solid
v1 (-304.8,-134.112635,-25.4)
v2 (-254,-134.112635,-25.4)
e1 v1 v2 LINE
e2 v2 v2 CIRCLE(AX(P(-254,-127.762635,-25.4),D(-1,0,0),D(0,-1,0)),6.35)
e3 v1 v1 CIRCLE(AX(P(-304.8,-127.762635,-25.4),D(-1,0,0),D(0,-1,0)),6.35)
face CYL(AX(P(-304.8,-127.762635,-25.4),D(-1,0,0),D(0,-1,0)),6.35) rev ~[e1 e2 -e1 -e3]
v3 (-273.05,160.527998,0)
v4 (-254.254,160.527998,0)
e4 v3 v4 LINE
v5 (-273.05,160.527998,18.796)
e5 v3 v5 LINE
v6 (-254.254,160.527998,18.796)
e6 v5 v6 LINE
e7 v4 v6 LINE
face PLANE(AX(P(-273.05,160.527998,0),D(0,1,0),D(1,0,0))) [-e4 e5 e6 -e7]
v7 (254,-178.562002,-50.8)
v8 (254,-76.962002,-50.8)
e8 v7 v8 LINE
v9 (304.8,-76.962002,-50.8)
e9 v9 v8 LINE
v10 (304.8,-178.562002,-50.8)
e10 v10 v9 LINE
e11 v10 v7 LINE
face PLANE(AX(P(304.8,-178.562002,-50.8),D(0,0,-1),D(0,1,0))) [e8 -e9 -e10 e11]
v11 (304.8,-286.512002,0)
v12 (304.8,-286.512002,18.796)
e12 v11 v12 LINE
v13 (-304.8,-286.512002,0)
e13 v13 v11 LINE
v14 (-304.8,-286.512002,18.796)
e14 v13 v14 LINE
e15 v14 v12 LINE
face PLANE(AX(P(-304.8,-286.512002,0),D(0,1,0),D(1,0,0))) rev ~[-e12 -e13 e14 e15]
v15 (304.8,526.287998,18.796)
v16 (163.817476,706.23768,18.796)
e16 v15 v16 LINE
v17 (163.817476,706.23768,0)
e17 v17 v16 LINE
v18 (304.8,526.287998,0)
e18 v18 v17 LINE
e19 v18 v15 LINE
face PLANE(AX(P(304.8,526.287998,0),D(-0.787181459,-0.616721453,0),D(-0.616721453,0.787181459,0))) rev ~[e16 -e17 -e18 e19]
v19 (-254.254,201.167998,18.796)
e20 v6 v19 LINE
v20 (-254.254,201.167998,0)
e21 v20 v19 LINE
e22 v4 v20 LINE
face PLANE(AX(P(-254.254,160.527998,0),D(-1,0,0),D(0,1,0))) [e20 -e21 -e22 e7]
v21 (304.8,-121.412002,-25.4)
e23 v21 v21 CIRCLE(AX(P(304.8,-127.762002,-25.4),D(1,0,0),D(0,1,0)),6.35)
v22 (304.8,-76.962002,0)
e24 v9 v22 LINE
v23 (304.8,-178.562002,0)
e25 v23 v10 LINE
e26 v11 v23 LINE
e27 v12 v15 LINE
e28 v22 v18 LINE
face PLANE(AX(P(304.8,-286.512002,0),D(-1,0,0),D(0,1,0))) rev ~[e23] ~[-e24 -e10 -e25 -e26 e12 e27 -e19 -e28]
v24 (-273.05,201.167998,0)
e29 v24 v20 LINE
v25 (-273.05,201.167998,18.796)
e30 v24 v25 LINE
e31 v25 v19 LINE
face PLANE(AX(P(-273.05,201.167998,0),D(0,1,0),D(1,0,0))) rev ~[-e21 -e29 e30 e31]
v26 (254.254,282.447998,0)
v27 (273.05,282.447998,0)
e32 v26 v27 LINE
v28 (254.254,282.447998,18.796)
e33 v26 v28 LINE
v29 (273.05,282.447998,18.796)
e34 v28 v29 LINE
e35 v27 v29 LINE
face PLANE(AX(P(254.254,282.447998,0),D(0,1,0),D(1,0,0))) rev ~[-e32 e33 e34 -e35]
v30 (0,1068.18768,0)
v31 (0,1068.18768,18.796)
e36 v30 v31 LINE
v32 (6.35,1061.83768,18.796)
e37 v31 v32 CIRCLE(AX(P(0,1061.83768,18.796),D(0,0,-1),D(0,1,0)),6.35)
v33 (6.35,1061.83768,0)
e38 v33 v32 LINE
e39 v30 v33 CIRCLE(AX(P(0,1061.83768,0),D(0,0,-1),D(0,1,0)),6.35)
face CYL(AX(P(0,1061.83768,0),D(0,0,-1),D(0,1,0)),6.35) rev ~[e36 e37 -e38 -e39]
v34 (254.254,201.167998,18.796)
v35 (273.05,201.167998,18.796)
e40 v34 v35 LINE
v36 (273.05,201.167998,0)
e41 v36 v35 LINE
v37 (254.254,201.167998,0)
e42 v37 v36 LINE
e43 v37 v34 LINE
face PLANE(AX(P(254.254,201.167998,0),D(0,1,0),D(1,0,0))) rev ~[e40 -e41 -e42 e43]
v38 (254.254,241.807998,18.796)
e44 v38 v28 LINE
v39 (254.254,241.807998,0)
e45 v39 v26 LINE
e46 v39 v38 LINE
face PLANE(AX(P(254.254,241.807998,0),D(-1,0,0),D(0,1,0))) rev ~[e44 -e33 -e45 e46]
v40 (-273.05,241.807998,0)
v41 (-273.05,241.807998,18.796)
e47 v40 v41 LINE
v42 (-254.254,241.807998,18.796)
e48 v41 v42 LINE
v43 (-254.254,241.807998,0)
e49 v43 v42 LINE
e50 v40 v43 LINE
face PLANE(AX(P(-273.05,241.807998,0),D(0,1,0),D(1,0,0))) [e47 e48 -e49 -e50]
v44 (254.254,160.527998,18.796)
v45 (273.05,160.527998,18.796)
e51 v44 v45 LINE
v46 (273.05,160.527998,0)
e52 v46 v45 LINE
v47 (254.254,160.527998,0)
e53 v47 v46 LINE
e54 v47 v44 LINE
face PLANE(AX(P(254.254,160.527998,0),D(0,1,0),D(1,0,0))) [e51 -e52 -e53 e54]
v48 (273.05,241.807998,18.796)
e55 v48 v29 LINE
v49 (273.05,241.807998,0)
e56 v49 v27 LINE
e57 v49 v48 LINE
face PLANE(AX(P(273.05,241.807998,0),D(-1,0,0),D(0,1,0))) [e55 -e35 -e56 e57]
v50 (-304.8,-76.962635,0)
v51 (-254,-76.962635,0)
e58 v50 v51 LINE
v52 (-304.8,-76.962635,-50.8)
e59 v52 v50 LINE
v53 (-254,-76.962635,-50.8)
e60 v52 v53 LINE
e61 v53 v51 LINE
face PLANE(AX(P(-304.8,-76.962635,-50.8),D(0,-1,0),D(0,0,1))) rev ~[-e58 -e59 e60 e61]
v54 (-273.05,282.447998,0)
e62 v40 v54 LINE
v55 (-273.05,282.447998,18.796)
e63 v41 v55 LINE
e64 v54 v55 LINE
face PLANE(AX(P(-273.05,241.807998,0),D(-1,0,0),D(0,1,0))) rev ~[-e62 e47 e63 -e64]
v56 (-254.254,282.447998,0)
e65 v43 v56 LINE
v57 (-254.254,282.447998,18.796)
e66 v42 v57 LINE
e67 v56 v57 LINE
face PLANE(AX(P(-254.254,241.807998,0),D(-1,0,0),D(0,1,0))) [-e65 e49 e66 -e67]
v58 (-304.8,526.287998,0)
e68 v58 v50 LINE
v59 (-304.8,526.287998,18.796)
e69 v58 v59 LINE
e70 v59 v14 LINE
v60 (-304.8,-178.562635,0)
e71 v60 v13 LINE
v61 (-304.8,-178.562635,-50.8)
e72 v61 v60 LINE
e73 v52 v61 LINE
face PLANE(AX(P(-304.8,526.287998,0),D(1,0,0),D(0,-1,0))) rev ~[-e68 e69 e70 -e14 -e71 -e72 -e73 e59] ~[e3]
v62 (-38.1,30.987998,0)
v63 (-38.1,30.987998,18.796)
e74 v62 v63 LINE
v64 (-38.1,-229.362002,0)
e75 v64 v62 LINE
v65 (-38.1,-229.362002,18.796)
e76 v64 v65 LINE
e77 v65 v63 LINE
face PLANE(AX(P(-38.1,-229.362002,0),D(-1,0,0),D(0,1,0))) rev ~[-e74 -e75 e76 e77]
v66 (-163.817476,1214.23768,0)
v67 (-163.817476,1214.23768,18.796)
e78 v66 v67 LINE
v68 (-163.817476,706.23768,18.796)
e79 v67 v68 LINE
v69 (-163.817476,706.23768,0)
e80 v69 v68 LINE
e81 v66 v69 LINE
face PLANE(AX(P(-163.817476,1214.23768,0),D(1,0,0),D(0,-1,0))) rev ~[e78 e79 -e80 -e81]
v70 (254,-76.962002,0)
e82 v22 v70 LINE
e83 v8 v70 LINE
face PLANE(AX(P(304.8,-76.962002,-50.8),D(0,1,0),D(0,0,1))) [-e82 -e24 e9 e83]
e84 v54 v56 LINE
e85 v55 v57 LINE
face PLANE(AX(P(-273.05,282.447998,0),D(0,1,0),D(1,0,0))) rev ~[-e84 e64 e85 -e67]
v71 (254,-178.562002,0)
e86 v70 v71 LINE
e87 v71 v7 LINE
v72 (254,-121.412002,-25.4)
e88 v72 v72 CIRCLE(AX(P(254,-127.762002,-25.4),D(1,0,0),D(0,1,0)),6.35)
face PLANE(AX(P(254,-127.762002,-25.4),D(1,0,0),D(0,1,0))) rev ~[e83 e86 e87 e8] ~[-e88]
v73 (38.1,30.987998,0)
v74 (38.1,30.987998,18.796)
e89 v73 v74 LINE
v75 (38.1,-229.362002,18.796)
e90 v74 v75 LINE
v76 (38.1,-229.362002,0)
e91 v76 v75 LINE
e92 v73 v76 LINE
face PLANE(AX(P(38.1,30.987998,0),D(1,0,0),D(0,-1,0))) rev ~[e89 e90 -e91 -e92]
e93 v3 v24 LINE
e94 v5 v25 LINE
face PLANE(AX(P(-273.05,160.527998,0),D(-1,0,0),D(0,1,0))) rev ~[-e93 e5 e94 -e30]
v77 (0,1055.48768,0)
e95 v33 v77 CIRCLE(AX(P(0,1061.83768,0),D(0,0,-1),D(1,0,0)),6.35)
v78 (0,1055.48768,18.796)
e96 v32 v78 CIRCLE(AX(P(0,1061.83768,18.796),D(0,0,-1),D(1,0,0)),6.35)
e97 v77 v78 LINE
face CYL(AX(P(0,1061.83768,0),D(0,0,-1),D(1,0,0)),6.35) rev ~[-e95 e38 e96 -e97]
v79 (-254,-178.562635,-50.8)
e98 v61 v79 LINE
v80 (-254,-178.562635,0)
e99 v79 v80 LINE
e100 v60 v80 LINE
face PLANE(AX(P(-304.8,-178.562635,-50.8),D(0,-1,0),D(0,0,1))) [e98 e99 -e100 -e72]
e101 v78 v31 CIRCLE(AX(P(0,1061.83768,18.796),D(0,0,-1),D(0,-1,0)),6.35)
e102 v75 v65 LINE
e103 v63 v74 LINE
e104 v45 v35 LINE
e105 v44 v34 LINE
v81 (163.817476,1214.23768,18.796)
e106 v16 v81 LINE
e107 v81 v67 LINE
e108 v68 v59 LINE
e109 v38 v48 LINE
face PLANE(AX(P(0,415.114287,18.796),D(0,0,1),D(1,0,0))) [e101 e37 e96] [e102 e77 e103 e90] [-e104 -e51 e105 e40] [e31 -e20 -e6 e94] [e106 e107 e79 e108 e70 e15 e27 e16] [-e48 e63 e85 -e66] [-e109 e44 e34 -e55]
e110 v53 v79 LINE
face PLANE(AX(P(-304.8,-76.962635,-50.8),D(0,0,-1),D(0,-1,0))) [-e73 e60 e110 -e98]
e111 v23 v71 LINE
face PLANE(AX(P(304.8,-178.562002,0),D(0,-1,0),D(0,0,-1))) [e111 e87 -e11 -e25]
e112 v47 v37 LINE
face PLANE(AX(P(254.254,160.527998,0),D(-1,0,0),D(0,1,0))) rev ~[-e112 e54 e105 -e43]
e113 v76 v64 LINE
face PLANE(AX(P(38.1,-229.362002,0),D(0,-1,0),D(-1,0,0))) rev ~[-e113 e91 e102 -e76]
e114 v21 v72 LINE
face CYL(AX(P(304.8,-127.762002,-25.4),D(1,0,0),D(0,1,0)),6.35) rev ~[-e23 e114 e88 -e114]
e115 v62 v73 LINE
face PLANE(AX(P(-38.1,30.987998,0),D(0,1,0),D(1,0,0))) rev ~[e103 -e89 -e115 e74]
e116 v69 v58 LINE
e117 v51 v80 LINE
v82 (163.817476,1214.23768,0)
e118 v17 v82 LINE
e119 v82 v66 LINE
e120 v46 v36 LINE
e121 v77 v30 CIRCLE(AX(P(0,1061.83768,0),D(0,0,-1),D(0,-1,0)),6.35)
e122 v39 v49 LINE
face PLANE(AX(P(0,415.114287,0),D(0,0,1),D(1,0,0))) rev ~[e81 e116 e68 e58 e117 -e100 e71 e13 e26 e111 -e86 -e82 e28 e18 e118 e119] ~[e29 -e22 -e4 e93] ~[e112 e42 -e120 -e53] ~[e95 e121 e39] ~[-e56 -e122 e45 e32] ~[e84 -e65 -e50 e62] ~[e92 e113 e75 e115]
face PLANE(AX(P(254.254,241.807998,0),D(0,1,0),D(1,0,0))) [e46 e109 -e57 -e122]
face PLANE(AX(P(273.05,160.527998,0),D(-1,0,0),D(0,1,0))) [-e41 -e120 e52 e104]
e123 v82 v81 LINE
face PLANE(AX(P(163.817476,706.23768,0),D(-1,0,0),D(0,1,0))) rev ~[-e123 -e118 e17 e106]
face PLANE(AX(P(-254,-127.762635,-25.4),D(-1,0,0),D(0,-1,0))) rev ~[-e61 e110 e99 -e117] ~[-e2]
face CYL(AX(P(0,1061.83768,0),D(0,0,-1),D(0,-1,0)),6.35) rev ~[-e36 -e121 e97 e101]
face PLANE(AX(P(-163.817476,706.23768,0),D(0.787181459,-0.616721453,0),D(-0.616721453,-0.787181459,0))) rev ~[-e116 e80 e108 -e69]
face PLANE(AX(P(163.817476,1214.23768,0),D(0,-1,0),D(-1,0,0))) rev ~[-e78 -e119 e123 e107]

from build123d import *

# Parameters (mm, degrees)
F0_W     = 18.796
F0_H     = 40.64
F1_DEPTH = 18.796
F2_R     = 6.35
F3_DEPTH = 50.8
F4_W     = 101.6
F4_H     = 50.8
F4_R     = 6.35
F5_DEPTH = 50.8


# Not quite as in the source:
# - a feature names something its author has since deleted; it is built from what else it names


with BuildPart() as f1:
    # F0 (on Top) → F1 (new body)
    with BuildSketch(Plane.XY):
        Polygon((-163.8174757903, 706.2376797943), (-304.8, 526.2879983068), (-304.8, 30.9879983068), (-304.8, -286.5120016932), (304.8, -286.5120016932), (304.8, 30.9879983068), (304.8, 526.2879983068), (163.8174757903, 706.2376797943), (163.8174757903, 1214.2376797943), (-163.8174757903, 1214.2376797943), align=None)
        with Locations((-263.652, 180.8479983068)):
            Rectangle(F0_W, F0_H, mode=Mode.SUBTRACT)
        with Locations((-263.652, 262.1279983068)):
            Rectangle(F0_W, F0_H, mode=Mode.SUBTRACT)
        Polygon((38.1, 30.9879983068), (38.1, -229.3620016932), (-38.1, -229.3620016932), (-38.1, 30.9879983068), (0, 30.9879983068), align=None, mode=Mode.SUBTRACT)
        with Locations((263.652, 180.8479983068)):
            Rectangle(F0_W, F0_H, mode=Mode.SUBTRACT)
        with Locations((263.652, 262.1279983068)):
            Rectangle(F0_W, F0_H, mode=Mode.SUBTRACT)
        with BuildLine():
            ThreePointArc((0, 1055.4876797943), (-6.35, 1061.8376797943), (0, 1068.1876797943))
            ThreePointArc((0, 1068.1876797943), (4.4901280605, 1066.3278078548), (6.35, 1061.8376797943))
            ThreePointArc((6.35, 1061.8376797943), (4.4901280605, 1057.3475517337), (0, 1055.4876797943))
        make_face(mode=Mode.SUBTRACT)
    extrude(amount=F1_DEPTH)

    # F2 (on face) → F3 (join)
    with BuildSketch(Plane.YZ.offset(304.8)):
        Polygon((-127.7620016932, 0), (-178.5620016932, 0), (-178.5620016932, -50.8), (-127.7620016932, -50.8), (-76.9620016932, -50.8), (-76.9620016932, 0), align=None)
        with Locations((-127.7620016932, -25.4)):
            Circle(F2_R, mode=Mode.SUBTRACT)
    extrude(amount=-F3_DEPTH)

    # F4 (on face) → F5 (join)
    with BuildSketch(Plane(origin=(-304.8, 0, 0), x_dir=(0, -1, 0), z_dir=(-1, 0, 0))):
        with Locations((127.7626349211, -25.4)):
            Rectangle(F4_W, F4_H)
        with Locations((127.7626349211, -25.4)):
            Circle(F4_R, mode=Mode.SUBTRACT)
    extrude(amount=-F5_DEPTH)


solid = f1.part
